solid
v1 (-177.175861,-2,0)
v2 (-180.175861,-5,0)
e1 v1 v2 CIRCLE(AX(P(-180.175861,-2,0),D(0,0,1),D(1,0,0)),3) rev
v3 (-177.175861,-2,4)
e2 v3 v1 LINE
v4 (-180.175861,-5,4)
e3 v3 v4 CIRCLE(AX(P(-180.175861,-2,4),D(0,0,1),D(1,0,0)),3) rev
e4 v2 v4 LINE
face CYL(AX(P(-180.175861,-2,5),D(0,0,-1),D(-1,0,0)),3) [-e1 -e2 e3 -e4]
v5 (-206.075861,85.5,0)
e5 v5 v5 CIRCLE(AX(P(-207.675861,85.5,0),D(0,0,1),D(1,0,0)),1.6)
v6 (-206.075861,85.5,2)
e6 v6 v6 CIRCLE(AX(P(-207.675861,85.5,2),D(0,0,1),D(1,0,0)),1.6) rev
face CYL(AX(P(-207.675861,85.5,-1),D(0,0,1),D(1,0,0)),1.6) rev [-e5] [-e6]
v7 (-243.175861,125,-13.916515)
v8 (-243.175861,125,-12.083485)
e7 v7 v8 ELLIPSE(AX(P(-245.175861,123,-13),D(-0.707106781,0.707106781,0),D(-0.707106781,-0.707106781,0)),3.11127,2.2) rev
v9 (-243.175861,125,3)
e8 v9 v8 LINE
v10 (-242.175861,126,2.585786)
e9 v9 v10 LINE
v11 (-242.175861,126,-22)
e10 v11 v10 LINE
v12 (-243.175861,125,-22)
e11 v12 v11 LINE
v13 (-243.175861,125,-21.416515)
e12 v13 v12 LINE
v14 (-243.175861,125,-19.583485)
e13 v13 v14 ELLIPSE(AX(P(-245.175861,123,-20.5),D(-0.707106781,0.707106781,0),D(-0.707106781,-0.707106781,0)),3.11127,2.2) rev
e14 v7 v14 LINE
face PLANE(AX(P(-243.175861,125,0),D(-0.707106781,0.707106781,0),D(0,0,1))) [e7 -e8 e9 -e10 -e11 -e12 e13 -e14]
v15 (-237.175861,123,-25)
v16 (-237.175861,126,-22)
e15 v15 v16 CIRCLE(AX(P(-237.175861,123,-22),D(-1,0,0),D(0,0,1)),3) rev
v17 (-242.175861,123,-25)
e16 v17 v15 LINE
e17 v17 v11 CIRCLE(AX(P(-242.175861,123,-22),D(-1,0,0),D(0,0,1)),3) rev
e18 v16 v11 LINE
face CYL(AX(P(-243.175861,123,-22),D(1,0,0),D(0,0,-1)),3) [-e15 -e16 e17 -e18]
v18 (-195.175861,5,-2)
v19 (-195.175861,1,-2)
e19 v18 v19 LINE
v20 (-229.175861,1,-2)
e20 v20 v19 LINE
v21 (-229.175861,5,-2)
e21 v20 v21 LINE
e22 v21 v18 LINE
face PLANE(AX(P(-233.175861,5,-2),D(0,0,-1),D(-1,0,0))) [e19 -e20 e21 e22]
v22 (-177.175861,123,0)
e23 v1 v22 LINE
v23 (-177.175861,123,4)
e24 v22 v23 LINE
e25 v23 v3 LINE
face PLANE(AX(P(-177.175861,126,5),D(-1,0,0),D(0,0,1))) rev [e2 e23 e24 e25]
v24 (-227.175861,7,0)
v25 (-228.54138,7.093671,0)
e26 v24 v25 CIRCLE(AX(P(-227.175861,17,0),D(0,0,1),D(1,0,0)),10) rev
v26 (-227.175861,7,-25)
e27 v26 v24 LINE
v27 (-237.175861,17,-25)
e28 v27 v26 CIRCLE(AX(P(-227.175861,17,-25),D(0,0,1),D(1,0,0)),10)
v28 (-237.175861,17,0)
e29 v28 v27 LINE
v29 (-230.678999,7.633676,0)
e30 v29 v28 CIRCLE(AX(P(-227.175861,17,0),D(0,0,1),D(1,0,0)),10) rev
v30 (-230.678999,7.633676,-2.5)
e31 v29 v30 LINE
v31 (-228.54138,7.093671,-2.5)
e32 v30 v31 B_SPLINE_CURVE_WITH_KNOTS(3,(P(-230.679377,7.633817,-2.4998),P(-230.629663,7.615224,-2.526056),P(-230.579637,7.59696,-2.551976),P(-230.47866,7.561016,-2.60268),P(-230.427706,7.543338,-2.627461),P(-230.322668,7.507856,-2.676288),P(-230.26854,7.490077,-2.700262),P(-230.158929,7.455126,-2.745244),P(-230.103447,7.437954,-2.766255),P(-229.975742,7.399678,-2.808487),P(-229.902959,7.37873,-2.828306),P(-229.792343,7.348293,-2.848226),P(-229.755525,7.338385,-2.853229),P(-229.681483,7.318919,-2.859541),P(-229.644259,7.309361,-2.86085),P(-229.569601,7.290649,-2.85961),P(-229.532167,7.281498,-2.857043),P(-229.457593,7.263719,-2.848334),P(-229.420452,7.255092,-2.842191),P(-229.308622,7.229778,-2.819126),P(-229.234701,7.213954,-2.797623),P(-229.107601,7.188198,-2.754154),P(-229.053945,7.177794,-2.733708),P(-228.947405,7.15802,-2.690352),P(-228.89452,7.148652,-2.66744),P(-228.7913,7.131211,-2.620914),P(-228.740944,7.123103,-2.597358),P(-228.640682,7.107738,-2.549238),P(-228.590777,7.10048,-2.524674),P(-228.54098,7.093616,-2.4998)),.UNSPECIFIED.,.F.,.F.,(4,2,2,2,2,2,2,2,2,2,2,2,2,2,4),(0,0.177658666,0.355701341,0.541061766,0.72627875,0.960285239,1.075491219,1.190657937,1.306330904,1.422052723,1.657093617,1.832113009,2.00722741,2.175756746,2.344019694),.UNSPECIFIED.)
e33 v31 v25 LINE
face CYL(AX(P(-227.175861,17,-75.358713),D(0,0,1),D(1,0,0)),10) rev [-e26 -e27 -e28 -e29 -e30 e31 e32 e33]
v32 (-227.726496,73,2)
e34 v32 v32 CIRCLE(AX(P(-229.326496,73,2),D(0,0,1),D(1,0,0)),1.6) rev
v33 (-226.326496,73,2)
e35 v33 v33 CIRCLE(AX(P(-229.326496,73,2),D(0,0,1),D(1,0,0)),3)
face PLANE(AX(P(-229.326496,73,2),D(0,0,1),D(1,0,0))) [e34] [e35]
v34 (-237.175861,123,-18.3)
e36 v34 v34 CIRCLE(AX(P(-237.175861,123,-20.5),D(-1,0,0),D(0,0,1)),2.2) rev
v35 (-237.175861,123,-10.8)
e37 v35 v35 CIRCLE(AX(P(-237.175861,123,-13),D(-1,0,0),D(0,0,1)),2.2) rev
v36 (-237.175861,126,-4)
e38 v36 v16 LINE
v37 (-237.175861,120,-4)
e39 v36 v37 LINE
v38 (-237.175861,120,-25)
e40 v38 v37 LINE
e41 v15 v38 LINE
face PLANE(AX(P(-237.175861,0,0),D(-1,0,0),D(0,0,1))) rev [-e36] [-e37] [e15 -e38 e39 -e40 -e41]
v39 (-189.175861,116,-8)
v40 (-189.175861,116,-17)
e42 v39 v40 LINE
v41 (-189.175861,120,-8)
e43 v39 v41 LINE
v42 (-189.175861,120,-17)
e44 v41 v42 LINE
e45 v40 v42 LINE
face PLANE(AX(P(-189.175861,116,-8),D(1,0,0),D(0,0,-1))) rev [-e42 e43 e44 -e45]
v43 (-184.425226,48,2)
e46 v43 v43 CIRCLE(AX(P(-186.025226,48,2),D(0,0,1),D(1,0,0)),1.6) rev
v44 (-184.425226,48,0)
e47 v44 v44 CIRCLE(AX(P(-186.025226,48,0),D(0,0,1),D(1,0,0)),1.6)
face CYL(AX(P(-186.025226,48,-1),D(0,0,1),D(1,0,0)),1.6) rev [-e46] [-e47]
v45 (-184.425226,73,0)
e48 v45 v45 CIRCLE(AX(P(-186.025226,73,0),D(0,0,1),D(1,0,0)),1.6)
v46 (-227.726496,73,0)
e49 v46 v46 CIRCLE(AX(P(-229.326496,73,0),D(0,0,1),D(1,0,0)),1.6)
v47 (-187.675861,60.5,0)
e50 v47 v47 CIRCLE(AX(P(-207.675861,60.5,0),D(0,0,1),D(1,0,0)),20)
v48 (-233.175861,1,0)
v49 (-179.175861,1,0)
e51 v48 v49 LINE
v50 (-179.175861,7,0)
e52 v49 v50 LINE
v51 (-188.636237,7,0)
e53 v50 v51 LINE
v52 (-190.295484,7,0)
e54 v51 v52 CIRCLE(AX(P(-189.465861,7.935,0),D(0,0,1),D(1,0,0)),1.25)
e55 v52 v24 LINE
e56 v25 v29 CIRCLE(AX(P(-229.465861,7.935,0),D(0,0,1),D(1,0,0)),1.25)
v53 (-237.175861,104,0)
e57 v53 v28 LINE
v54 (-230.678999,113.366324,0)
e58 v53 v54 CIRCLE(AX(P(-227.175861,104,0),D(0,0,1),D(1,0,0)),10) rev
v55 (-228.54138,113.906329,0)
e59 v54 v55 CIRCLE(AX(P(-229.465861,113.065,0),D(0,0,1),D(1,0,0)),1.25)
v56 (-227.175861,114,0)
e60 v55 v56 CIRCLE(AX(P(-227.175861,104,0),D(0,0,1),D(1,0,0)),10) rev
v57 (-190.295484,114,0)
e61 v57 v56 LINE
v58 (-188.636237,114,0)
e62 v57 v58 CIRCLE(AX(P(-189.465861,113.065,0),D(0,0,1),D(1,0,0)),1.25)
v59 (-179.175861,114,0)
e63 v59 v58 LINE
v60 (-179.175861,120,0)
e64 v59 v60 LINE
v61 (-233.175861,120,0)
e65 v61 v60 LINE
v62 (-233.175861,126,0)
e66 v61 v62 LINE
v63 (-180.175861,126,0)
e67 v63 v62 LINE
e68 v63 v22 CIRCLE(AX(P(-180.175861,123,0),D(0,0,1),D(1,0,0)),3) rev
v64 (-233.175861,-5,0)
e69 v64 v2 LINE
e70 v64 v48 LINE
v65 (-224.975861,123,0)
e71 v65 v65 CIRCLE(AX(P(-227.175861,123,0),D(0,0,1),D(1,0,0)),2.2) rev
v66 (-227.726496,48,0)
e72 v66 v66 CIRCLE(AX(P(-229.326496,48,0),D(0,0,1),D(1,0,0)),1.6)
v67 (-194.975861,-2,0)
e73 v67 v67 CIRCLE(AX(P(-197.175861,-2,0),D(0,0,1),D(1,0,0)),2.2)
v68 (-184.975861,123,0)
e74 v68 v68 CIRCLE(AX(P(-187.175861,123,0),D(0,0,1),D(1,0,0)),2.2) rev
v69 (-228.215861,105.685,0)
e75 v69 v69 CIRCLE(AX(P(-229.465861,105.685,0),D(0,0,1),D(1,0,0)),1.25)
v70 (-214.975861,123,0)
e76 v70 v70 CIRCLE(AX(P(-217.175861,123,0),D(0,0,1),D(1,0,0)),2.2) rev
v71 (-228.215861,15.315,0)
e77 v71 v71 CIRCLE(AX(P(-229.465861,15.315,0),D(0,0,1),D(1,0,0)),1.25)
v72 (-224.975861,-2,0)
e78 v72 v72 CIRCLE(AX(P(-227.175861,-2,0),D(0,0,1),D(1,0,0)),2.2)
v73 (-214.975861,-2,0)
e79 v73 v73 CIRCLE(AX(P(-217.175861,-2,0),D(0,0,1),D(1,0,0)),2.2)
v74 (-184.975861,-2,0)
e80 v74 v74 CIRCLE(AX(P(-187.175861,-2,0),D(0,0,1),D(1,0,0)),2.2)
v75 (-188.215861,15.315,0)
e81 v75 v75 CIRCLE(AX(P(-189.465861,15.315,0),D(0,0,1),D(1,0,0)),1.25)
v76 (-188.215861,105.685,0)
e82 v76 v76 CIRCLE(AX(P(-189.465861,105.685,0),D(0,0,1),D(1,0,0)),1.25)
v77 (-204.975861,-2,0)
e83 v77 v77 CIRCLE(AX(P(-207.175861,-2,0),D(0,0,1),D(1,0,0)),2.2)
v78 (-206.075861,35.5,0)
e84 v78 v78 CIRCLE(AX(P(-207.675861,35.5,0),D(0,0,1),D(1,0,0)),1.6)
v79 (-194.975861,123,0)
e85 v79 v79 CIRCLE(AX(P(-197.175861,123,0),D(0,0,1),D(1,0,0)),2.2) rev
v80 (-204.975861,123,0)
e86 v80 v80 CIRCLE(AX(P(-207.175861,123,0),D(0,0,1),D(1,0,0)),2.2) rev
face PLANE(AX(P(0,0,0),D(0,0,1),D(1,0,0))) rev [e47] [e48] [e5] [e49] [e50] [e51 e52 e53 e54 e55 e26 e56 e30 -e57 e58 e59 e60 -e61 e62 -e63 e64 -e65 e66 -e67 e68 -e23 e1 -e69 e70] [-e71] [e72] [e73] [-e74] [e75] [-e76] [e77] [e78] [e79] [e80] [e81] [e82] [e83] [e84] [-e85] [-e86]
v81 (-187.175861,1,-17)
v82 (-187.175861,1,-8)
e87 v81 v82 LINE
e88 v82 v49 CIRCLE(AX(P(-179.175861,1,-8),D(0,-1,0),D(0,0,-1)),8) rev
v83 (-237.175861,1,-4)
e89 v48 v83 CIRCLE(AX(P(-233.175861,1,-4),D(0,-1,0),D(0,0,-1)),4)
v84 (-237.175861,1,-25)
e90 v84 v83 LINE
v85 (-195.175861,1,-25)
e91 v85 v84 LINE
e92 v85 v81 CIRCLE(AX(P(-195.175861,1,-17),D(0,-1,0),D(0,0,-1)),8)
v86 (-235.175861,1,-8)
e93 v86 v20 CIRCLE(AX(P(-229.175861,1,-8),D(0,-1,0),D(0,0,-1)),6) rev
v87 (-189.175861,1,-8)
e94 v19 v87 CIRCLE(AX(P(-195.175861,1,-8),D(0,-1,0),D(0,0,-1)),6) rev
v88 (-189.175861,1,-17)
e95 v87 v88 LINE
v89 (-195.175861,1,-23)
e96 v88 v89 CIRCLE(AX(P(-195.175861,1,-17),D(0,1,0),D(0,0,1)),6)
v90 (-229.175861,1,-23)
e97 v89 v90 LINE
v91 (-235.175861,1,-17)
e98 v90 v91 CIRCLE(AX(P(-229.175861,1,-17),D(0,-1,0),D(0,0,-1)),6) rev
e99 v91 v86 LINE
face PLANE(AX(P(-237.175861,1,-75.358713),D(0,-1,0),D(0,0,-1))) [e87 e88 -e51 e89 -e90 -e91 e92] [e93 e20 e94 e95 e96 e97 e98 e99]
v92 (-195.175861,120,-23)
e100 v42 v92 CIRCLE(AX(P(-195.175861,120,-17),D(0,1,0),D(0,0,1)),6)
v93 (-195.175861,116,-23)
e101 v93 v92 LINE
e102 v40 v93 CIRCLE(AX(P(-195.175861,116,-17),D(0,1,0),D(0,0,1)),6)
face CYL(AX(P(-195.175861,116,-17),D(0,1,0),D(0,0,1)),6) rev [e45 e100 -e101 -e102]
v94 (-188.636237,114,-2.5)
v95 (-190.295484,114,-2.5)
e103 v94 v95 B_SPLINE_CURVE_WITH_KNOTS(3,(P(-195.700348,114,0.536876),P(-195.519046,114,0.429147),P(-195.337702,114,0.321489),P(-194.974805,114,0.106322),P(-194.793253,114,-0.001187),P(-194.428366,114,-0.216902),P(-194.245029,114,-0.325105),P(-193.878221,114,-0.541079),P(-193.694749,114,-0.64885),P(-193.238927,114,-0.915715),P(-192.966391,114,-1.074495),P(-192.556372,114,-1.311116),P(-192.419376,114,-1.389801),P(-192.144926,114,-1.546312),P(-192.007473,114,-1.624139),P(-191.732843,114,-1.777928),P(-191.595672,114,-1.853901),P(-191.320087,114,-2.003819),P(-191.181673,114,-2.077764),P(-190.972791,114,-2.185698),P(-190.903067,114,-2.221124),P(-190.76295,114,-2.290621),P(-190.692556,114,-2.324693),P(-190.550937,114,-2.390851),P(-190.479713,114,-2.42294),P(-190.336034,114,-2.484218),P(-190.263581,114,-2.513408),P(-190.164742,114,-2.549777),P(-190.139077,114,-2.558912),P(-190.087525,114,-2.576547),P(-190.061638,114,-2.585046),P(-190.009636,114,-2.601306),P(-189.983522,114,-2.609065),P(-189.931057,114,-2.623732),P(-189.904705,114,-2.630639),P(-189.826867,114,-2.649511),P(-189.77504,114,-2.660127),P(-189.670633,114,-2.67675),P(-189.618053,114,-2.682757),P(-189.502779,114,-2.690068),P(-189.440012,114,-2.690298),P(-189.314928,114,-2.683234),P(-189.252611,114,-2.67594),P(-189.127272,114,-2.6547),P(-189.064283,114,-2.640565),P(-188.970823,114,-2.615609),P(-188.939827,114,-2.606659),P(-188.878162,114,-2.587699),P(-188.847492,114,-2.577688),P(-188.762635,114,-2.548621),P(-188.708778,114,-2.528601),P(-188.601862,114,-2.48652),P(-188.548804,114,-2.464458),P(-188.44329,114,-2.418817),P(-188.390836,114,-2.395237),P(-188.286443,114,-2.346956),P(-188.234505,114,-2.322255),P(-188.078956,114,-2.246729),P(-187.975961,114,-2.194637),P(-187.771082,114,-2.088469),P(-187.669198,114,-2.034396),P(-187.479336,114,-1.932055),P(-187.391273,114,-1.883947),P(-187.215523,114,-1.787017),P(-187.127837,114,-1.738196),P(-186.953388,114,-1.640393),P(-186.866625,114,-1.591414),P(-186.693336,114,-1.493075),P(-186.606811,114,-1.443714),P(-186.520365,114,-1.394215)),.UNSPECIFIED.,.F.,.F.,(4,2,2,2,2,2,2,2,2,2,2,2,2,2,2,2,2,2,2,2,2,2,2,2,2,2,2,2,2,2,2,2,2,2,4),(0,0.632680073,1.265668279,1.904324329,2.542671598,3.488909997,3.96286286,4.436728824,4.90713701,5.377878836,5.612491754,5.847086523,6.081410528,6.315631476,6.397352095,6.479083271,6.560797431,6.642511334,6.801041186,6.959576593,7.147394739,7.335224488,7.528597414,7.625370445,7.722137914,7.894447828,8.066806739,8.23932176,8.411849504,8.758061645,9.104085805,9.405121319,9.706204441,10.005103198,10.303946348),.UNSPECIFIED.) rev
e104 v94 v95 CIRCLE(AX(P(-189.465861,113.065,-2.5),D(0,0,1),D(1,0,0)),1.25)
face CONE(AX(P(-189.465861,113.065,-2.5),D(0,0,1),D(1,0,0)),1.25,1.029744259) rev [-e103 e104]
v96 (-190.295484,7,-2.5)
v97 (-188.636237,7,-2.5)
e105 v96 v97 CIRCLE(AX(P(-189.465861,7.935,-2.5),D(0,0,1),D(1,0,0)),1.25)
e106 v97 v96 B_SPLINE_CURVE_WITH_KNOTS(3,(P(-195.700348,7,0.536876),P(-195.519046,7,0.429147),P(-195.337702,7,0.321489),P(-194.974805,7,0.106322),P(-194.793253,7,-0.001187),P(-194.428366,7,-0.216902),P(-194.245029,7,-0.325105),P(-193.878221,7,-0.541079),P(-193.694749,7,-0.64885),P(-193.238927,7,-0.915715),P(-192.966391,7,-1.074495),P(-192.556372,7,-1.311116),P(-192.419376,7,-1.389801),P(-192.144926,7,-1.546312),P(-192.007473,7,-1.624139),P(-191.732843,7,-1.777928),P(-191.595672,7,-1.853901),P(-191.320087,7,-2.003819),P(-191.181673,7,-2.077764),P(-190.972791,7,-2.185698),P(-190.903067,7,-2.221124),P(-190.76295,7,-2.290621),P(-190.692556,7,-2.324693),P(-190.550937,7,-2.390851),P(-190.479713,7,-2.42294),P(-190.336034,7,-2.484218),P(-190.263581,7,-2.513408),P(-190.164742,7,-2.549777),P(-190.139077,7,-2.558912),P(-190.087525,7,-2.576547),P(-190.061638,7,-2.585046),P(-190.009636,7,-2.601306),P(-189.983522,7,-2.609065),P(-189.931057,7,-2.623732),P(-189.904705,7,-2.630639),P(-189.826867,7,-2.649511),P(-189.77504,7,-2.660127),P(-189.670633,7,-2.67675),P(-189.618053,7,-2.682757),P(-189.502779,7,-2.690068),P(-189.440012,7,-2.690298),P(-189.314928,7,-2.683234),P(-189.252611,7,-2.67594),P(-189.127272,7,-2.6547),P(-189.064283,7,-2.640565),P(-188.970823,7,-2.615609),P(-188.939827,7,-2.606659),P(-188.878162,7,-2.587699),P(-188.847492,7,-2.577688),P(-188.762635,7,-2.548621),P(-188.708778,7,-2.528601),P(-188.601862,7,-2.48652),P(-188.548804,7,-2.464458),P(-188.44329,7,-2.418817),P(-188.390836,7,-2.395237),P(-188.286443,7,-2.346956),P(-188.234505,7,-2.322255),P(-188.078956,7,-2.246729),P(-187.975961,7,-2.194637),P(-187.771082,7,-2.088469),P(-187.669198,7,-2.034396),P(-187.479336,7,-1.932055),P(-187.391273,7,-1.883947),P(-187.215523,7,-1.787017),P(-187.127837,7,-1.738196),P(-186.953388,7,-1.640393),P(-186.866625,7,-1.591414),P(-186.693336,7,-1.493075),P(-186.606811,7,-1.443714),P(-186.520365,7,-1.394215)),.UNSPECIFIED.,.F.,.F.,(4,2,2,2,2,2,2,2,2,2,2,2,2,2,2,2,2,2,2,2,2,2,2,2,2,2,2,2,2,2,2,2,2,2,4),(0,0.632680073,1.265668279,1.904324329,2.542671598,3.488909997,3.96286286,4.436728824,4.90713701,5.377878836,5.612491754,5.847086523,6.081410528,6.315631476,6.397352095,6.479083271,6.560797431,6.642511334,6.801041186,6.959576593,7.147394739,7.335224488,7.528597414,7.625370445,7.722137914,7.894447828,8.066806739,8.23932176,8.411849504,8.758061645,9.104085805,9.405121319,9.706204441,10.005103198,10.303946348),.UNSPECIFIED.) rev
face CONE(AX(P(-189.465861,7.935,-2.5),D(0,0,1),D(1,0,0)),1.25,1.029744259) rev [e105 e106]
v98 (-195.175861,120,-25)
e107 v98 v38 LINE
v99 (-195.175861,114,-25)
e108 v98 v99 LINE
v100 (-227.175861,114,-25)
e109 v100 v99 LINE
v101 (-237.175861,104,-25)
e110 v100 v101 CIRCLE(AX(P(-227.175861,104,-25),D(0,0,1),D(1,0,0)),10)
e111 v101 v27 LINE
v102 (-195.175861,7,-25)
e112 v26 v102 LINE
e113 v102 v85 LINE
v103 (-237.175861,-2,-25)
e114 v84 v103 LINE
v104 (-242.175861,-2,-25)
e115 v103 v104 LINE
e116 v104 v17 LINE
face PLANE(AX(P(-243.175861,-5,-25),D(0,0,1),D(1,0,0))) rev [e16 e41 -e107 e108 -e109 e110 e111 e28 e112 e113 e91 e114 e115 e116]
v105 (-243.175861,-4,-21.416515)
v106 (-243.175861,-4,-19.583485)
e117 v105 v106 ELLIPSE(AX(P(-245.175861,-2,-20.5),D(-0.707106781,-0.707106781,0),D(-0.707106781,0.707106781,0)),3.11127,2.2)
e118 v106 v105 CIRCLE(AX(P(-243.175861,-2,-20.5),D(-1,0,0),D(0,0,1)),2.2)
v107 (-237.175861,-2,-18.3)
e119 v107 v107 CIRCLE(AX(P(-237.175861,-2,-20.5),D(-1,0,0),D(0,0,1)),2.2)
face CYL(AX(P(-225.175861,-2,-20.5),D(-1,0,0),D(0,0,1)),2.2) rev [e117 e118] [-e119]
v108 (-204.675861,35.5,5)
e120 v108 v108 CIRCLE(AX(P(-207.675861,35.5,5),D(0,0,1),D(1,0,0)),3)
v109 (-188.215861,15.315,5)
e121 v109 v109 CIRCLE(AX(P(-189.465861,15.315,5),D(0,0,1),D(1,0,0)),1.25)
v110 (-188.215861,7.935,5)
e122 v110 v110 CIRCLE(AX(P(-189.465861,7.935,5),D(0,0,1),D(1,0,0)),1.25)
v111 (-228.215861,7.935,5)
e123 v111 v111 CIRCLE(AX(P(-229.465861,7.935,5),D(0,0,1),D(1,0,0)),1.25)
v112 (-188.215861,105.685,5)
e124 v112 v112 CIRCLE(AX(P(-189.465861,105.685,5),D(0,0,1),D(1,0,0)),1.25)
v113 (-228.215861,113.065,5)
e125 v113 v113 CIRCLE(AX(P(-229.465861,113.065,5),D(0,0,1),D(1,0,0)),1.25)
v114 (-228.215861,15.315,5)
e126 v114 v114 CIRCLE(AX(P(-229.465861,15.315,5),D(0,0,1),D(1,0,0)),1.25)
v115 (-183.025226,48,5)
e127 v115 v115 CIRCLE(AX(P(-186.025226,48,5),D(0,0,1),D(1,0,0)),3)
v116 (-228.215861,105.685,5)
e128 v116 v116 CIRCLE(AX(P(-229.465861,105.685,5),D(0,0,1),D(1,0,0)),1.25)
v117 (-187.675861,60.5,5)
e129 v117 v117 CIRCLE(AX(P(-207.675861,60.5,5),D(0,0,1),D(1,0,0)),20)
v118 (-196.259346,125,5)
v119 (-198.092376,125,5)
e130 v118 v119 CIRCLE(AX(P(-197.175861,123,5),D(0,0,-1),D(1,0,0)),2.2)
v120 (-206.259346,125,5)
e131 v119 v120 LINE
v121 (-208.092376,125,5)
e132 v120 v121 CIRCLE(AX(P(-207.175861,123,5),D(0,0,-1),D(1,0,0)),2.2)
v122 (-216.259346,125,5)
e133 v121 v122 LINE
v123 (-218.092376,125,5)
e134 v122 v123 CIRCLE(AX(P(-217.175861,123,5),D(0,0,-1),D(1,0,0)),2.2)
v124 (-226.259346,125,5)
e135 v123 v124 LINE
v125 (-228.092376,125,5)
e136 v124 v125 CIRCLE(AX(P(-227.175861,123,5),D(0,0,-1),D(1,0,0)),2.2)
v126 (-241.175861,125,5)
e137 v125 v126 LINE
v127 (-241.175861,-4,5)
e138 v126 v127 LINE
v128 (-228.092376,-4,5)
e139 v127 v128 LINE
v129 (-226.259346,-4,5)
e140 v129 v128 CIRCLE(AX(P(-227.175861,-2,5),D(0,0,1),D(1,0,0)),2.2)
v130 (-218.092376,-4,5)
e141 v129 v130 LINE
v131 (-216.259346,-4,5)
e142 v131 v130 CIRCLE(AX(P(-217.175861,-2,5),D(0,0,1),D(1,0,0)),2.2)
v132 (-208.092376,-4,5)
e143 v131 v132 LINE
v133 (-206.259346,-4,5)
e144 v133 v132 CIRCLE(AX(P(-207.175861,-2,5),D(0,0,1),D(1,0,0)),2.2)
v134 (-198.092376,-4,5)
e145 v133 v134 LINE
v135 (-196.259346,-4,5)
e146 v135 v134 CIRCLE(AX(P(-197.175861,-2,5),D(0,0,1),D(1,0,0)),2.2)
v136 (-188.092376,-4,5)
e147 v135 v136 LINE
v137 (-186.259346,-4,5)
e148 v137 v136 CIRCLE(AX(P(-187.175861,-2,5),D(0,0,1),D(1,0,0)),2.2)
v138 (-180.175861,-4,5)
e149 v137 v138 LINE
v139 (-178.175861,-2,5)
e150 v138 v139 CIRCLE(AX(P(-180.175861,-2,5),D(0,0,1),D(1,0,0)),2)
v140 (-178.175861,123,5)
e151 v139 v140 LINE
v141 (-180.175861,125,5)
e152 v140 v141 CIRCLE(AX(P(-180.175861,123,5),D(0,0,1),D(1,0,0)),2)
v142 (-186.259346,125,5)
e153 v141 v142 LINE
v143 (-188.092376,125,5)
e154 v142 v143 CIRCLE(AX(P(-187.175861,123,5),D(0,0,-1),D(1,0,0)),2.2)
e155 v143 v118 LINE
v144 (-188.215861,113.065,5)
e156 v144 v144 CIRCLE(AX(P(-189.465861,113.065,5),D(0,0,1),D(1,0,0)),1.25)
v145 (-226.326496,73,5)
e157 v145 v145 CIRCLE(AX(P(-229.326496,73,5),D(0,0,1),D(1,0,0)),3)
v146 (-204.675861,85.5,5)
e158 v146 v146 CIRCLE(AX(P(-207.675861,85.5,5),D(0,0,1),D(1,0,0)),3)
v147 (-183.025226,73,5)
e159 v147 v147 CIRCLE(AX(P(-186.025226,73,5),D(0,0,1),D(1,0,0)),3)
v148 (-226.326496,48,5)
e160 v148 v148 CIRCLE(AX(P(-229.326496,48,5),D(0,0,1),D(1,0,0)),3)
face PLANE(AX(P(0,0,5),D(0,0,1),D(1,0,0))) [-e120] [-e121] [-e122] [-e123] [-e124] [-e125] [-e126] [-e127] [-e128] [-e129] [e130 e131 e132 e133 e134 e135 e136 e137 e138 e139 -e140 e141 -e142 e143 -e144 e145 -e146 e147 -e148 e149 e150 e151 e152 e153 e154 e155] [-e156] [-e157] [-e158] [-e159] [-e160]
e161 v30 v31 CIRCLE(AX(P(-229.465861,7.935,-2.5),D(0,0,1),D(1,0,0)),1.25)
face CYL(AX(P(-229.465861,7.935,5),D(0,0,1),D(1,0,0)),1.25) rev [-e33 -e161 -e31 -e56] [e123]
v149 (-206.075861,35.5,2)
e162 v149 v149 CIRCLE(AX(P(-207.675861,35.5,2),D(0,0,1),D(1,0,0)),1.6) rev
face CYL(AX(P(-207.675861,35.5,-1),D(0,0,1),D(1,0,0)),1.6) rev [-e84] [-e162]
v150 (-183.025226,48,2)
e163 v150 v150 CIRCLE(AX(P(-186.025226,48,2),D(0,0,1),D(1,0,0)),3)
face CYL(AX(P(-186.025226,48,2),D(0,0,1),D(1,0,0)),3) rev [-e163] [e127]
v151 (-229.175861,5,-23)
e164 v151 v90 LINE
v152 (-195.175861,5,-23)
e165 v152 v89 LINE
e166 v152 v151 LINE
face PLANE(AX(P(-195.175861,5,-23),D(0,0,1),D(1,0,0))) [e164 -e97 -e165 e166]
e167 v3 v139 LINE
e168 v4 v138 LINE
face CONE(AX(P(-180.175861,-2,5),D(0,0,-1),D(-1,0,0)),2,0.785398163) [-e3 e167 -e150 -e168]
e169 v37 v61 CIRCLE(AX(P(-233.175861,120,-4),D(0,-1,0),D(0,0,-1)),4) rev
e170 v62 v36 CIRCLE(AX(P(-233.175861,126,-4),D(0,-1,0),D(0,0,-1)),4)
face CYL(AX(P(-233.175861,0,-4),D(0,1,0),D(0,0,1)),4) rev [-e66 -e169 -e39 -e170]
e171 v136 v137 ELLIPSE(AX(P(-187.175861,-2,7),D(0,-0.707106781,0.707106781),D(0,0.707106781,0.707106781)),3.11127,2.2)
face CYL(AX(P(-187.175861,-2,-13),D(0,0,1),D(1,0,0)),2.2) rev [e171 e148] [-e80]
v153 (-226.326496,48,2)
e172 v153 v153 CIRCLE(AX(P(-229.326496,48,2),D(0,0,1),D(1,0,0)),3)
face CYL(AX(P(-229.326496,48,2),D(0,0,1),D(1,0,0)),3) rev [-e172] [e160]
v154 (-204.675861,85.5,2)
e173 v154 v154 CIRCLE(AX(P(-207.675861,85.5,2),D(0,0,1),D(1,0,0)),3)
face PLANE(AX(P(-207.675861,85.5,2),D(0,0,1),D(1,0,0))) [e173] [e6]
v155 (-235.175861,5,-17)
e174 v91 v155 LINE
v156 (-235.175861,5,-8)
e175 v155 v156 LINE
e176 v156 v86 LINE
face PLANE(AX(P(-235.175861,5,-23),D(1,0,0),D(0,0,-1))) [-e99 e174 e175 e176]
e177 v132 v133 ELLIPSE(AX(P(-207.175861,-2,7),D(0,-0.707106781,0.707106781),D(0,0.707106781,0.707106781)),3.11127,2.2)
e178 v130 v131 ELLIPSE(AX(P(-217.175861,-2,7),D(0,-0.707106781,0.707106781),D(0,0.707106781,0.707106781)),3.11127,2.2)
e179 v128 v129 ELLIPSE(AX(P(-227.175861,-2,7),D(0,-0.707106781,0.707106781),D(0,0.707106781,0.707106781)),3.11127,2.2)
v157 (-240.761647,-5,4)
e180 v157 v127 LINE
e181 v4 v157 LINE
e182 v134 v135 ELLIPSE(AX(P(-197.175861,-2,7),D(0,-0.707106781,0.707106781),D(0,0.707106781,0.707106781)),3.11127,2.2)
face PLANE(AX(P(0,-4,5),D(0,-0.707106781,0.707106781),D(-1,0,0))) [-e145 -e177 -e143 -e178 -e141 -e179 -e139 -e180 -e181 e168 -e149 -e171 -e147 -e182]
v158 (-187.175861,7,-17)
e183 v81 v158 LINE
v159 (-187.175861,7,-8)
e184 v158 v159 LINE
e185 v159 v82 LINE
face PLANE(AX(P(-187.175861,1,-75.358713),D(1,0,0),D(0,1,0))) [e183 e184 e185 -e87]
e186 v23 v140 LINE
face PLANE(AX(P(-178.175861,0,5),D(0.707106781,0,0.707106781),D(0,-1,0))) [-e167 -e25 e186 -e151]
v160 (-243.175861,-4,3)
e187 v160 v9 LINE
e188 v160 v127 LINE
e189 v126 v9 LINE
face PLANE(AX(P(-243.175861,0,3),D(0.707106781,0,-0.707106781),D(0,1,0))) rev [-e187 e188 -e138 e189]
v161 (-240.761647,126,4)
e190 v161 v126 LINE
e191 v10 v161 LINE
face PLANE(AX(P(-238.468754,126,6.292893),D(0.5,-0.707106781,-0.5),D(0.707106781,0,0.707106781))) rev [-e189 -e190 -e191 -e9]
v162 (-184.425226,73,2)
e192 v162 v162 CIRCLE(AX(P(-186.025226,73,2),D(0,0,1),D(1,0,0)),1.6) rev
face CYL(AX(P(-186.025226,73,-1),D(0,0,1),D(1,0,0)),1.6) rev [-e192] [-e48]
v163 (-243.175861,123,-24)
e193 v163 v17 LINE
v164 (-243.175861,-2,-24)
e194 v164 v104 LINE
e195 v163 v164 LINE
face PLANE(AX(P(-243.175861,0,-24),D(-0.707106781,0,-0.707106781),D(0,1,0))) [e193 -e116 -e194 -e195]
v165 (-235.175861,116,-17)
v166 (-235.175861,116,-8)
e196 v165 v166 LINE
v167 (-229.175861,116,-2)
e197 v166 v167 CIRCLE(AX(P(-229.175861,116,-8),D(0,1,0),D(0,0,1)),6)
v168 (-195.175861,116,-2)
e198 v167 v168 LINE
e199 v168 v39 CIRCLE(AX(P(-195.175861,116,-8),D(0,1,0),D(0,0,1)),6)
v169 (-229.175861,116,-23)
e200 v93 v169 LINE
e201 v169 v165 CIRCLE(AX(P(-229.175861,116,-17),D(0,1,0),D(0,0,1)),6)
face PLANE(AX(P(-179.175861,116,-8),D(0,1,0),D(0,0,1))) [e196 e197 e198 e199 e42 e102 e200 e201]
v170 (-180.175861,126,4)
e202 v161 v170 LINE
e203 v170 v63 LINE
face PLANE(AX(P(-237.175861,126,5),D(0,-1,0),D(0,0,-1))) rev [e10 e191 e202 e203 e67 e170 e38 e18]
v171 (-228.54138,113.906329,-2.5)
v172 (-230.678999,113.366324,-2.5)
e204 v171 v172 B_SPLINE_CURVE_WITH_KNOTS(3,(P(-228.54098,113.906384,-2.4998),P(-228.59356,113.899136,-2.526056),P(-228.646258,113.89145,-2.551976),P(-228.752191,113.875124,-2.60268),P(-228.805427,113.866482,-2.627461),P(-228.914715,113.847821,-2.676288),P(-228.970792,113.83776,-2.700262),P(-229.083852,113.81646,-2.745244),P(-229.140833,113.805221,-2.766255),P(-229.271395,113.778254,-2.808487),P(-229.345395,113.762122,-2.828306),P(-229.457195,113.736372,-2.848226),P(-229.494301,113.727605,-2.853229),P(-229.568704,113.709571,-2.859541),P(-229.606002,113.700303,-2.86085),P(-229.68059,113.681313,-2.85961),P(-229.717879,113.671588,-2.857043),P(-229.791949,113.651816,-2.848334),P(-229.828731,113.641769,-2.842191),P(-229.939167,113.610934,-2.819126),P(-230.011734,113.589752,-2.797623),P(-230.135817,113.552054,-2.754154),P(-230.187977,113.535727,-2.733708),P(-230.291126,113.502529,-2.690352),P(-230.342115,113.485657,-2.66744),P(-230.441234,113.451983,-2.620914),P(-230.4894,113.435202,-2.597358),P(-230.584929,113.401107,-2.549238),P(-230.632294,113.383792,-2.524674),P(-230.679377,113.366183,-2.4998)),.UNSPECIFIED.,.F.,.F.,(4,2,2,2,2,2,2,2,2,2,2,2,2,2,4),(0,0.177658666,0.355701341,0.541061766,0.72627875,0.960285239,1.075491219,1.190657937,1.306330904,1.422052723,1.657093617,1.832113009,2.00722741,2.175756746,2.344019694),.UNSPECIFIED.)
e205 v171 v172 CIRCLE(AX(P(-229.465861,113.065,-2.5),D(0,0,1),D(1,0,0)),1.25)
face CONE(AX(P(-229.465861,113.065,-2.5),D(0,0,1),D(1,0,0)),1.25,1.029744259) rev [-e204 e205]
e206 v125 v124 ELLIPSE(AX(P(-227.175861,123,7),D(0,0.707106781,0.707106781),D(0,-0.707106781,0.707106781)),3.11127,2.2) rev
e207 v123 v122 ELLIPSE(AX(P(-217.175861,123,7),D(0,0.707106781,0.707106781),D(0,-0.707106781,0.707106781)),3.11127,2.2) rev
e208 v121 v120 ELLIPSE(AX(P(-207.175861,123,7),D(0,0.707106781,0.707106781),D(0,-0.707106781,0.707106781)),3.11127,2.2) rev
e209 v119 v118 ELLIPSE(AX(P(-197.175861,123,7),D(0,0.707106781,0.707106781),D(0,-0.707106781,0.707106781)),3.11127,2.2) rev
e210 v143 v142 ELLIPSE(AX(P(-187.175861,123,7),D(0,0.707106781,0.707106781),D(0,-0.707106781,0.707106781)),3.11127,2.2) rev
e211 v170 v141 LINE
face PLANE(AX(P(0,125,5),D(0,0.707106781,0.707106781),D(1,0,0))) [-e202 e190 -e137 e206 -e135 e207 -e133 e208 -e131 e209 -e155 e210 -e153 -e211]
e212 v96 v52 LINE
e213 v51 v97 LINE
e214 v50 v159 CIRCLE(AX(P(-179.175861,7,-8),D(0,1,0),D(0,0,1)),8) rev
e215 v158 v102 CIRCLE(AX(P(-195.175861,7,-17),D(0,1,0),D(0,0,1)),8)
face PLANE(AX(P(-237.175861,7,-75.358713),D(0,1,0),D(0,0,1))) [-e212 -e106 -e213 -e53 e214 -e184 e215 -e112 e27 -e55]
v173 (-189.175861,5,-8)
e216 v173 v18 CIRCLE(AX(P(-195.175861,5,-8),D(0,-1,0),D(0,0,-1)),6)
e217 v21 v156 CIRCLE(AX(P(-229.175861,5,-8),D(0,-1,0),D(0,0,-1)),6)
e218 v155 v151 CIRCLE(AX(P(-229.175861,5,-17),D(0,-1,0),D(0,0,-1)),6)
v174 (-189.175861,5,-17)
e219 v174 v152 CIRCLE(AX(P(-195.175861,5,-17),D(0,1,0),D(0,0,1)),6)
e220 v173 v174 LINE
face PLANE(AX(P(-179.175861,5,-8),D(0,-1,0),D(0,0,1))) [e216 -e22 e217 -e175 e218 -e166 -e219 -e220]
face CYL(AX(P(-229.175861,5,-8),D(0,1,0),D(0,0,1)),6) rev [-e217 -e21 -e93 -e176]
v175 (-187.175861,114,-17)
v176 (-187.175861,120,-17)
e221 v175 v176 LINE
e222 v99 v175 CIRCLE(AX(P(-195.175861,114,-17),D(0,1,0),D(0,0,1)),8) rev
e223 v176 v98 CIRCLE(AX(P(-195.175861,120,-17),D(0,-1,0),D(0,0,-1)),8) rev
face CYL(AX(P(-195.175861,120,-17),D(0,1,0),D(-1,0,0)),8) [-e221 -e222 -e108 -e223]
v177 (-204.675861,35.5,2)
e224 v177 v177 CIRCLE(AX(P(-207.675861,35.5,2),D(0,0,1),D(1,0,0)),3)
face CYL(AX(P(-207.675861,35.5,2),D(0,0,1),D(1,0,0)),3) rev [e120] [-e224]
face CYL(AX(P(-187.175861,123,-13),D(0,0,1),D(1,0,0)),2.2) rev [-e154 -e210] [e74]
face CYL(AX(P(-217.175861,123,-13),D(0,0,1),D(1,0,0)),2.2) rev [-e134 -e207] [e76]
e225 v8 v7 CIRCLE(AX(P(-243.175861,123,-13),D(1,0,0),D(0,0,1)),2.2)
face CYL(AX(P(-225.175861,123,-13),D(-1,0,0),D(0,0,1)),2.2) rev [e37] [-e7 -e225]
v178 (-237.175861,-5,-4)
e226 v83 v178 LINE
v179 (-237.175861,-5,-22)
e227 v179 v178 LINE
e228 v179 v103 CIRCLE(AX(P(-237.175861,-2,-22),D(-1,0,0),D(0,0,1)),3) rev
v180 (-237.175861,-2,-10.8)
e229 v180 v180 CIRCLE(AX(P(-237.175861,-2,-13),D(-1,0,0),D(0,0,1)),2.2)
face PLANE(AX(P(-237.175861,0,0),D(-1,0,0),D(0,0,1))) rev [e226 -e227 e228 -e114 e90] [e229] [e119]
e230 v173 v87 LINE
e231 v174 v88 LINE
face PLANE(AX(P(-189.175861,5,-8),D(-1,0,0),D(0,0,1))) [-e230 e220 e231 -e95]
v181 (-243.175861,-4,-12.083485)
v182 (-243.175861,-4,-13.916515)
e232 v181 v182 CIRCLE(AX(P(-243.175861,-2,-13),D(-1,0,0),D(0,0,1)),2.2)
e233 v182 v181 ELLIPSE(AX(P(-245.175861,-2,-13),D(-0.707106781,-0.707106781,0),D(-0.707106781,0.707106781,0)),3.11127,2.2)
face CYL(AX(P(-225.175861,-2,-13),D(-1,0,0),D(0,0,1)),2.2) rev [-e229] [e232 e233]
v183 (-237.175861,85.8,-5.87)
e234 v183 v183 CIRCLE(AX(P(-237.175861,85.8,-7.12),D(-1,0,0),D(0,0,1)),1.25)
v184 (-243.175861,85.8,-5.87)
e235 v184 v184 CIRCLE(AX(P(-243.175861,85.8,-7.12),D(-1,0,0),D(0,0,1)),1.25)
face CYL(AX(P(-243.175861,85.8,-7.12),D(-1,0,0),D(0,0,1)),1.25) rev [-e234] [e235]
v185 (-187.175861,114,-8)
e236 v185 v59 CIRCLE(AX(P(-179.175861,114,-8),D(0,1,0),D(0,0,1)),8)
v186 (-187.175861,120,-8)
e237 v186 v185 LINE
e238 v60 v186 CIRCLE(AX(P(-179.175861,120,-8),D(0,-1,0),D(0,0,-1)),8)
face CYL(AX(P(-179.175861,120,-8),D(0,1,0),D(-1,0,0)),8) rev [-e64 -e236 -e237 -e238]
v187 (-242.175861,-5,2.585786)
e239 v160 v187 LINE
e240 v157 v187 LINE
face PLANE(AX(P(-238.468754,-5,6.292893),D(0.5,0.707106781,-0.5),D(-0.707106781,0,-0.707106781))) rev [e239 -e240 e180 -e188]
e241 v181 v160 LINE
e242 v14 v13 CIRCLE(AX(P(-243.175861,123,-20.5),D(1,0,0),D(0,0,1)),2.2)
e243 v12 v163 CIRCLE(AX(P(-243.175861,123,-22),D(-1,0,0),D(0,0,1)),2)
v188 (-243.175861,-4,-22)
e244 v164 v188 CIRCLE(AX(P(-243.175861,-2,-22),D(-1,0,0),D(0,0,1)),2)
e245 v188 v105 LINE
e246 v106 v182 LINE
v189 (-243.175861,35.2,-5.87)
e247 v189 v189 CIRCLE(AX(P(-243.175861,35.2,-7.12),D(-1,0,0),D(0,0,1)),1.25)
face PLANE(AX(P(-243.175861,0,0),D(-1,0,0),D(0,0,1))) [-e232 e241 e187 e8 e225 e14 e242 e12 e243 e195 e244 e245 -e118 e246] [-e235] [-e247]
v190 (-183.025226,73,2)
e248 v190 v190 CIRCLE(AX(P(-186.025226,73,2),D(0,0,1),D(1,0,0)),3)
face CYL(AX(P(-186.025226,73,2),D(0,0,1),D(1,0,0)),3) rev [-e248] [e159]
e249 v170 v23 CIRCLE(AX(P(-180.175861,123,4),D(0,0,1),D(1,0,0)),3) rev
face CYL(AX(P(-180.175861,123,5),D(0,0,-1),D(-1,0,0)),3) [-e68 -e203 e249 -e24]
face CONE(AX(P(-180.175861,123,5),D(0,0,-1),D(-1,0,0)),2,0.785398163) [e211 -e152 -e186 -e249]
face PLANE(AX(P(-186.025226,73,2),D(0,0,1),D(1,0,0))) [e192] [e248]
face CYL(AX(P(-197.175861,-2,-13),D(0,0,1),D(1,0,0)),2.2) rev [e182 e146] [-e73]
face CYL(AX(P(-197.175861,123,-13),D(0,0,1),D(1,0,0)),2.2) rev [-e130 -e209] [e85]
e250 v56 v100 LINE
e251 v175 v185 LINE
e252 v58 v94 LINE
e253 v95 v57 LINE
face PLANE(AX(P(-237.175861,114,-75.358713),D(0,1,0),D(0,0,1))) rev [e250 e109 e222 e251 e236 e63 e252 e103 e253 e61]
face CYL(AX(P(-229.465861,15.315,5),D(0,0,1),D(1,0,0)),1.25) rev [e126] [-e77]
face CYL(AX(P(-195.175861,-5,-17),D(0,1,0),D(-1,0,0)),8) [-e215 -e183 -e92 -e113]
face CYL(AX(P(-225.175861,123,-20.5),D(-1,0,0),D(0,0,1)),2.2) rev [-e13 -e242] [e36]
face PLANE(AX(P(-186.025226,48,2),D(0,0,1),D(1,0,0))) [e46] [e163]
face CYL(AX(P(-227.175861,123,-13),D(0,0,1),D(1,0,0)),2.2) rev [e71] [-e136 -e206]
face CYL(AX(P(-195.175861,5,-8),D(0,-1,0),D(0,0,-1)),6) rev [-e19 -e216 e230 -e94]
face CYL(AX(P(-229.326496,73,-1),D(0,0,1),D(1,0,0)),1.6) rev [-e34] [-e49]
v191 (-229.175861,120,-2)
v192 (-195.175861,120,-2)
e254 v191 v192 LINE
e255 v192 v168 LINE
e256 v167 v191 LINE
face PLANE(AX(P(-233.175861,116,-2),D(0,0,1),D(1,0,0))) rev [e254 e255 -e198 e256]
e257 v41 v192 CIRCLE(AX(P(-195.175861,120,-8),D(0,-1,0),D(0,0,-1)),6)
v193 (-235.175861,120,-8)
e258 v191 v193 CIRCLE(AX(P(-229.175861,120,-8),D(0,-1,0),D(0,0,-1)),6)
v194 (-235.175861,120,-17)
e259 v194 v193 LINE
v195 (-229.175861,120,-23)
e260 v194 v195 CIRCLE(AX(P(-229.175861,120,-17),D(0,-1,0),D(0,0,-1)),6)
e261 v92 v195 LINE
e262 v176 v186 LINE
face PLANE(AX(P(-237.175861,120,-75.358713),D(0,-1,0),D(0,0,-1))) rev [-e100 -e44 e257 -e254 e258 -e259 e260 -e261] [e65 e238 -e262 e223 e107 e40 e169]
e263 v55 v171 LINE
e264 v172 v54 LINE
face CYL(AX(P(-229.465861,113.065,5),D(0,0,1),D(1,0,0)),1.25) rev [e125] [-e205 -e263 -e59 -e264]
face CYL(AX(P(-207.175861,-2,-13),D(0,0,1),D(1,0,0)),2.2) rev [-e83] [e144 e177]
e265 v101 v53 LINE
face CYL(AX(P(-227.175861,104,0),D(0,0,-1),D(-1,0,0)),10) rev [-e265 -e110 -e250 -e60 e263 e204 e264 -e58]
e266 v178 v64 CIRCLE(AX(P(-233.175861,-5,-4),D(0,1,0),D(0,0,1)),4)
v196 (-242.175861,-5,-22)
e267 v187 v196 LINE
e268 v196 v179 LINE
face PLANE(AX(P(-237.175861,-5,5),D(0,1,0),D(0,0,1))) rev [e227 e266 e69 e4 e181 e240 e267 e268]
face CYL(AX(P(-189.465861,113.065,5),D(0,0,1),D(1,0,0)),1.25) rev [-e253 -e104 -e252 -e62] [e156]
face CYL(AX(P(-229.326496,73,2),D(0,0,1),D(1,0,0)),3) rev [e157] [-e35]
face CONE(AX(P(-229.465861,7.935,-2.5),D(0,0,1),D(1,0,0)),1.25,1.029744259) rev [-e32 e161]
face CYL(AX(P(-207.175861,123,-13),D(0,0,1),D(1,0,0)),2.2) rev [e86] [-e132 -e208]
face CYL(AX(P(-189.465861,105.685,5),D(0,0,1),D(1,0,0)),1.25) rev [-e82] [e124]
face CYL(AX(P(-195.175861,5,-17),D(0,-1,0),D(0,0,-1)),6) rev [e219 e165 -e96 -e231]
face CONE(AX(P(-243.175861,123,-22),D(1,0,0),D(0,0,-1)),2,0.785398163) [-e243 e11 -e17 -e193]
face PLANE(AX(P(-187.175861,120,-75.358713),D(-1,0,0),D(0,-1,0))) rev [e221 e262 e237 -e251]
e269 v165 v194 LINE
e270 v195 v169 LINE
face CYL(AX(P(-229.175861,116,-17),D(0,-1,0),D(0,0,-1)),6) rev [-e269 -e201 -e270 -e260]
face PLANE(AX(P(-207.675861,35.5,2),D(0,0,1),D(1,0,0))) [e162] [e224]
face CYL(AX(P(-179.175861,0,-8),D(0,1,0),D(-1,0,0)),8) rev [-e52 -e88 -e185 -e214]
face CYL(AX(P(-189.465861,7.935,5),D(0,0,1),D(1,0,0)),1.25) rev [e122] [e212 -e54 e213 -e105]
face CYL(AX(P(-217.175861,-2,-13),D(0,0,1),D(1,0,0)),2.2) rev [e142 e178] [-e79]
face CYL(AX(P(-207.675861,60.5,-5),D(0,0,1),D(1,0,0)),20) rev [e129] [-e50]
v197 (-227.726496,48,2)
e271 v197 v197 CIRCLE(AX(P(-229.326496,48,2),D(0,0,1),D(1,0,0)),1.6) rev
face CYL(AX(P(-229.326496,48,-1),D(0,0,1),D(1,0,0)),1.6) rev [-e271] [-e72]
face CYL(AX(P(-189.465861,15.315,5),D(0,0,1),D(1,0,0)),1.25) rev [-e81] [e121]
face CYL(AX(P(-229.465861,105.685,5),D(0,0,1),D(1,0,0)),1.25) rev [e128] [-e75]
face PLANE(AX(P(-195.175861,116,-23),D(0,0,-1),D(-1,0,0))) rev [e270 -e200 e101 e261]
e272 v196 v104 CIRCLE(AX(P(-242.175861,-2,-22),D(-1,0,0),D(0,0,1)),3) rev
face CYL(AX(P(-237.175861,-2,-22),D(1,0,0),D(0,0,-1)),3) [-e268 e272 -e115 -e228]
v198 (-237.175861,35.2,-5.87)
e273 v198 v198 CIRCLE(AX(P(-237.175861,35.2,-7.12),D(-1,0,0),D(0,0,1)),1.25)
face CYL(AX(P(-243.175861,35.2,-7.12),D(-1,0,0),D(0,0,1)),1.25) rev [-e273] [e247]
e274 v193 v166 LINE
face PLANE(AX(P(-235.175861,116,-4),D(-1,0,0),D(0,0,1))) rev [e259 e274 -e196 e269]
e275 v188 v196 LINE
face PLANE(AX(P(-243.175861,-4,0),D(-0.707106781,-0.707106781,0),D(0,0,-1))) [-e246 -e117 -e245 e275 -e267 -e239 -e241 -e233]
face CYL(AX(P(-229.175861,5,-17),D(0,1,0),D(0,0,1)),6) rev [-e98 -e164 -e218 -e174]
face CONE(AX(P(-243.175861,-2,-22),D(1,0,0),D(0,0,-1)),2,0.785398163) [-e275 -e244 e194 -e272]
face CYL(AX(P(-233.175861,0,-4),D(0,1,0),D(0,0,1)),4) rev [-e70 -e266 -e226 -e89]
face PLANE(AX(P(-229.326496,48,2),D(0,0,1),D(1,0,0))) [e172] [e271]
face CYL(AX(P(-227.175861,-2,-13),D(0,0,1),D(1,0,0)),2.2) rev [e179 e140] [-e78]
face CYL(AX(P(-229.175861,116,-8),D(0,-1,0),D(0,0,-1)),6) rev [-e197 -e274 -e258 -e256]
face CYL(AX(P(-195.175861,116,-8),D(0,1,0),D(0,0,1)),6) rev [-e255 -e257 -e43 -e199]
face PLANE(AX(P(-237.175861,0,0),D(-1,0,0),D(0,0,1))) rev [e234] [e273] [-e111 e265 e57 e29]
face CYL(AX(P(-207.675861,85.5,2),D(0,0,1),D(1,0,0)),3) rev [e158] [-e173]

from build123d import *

# Parameters (mm, degrees)
SKETCH_1_W                  = 60
SKETCH_1_H                  = 131
EXTRUDE_1_DEPTH             = 5
SKETCH_2_W                  = 30
SKETCH_2_H                  = 131
EXTRUDE_2_DEPTH             = 6
SKETCH_3_R                  = 20
CUT_EXTRUDE_1_DEPTH         = 10
CHAMFER_1_SIZE              = 2
FILLET_1_R                  = 3
SKETCH_13_R                 = 1.6
CUT_EXTRUDE_2_DEPTH         = 6
SKETCH_14_R                 = 3
CUT_EXTRUDE_3_DEPTH         = 3
CHAMFER_4_SIZE              = 1
SKETCH_16_W                 = 50
SKETCH_16_H                 = 6
EXTRUDE_4_DEPTH             = 25
FILLET_3_R                  = 4
FILLET_4_R                  = 10
FILLET_5_R                  = 8
CUT_EXTRUDE_4_DEPTH         = 4
FILLET_6_R                  = 6
SKETCH_19_R                 = 2.2
CUT_EXTRUDE_5_DEPTH         = 18
SKETCH_20_R                 = 2.2
CUT_EXTRUDE_6_DEPTH         = 18
HOLE_WIZARD_M3_1_AT_2_COUNT = 2
HOLE_WIZARD_M3_1_AT_2_PITCH = 40
HOLE_WIZARD_M3_1_AT_3_COUNT = 2
HOLE_WIZARD_M3_1_AT_3_PITCH = 105.617529322
HOLE_WIZARD_M3_1_AT_4_COUNT = 2
HOLE_WIZARD_M3_1_AT_4_PITCH = 97.75
HOLE_WIZARD_M3_2_D          = 2.5
HOLE_WIZARD_M3_2_DEPTH      = 7.5
HOLE_WIZARD_M3_2_TIP        = 0.751075774


with BuildPart() as part:
    # 草图1 → 凸台-拉伸1 (new body)
    with BuildSketch(Plane.XY):
        with Locations((-207.175860782, 60.5)):
            Rectangle(SKETCH_1_W, SKETCH_1_H)
    extrude(amount=EXTRUDE_1_DEPTH)

    # 草图2 → 凸台-拉伸2 (add)
    with BuildSketch(Plane.ZY.offset(237.175860782)):
        with Locations((-10, 60.5)):
            Rectangle(SKETCH_2_W, SKETCH_2_H)
    extrude(amount=EXTRUDE_2_DEPTH)

    # 草图3 → 切除-拉伸1 (cut)
    with BuildSketch(Plane.XY.offset(5)):
        with Locations((-207.675860782, 60.5)):
            Circle(SKETCH_3_R)
    extrude(amount=-CUT_EXTRUDE_1_DEPTH, mode=Mode.SUBTRACT)

    # 倒角1
    chamfer_1_edges = [part.edges().sort_by_distance(p)[0] for p in [
        (-243.175860782, 60.5, 5),
    ]]
    chamfer(chamfer_1_edges, length=CHAMFER_1_SIZE)

    # 圆角1
    fillet_1_edges = [part.edges().sort_by_distance(p)[0] for p in [
        (-240.175860782, 126, -25),
        (-240.175860782, -5, -25),
        (-177.175860782, 126, 2.5),
        (-177.175860782, -5, 2.5),
    ]]
    fillet(fillet_1_edges, radius=FILLET_1_R)

    # 草图13 → 切除-拉伸2 (cut)
    with BuildSketch(Plane.XY.offset(5)):
        with Locations((-207.675860782, 85.5)):
            Circle(SKETCH_13_R)
        with Locations((-229.326495877, 73)):
            Circle(SKETCH_13_R)
        with Locations((-186.025225688, 73)):
            Circle(SKETCH_13_R)
        with Locations((-186.025225688, 48)):
            Circle(SKETCH_13_R)
        with Locations((-207.675860782, 35.5)):
            Circle(SKETCH_13_R)
        with Locations((-229.326495877, 48)):
            Circle(SKETCH_13_R)
    extrude(amount=-CUT_EXTRUDE_2_DEPTH, mode=Mode.SUBTRACT)

    # 草图14 → 切除-拉伸3 (cut)
    with BuildSketch(Plane.XY.offset(5)):
        with Locations((-207.675860782, 85.5)):
            Circle(SKETCH_14_R)
        with Locations((-186.025225688, 73)):
            Circle(SKETCH_14_R)
        with Locations((-186.025225688, 48)):
            Circle(SKETCH_14_R)
        with Locations((-207.675860782, 35.5)):
            Circle(SKETCH_14_R)
        with Locations((-229.326495877, 48)):
            Circle(SKETCH_14_R)
        with Locations((-229.326495877, 73)):
            Circle(SKETCH_14_R)
    extrude(amount=-CUT_EXTRUDE_3_DEPTH, mode=Mode.SUBTRACT)

    # 倒角4
    chamfer_4_edges = [part.edges().sort_by_distance(p)[0] for p in [
        (-243.175860782, 126, -9.5),
        (-242.175860782, 126, 4),
        (-210.675860782, -5, 5),
        (-242.175860782, -5, 4),
        (-243.175860782, 60.5, -25),
        (-210.675860782, 126, 5),
        (-243.175860782, -5, -9.5),
        (-243.175860782, -4.121320344, -24.121320344),
        (-243.175860782, 125.121320344, -24.121320344),
        (-177.175860782, 60.5, 5),
        (-178.054540439, -4.121320344, 5),
        (-178.054540439, 125.121320344, 5),
    ]]
    chamfer(chamfer_4_edges, length=CHAMFER_4_SIZE)

    # 草图16 → 凸台-拉伸4 (add)
    with BuildSketch(Plane(origin=(0, 0, 0), x_dir=(-1, 0, 0), z_dir=(0, 0, -1))):
        with Locations((212.175860782, 117)):
            Rectangle(SKETCH_16_W, SKETCH_16_H)
    extrude_4 = extrude(amount=EXTRUDE_4_DEPTH)

    # 镜向1: 凸台-拉伸4 across plane
    add(extrude_4.mirror(Plane(origin=(0, 60.5, 0), x_dir=(0, 0, 1), z_dir=(0, -1, 0))))

    # 圆角3
    fillet_3_edges = [part.edges().sort_by_distance(p)[0] for p in [
        (-237.175860782, -2, 0),
        (-237.175860782, 123, 0),
    ]]
    fillet(fillet_3_edges, radius=FILLET_3_R)

    # 圆角4
    fillet_4_edges = [part.edges().sort_by_distance(p)[0] for p in [
        (-237.175860782, 114, -12.5),
        (-237.175860782, 7, -12.5),
    ]]
    fillet(fillet_4_edges, radius=FILLET_4_R)

    # 圆角5
    fillet_5_edges = [part.edges().sort_by_distance(p)[0] for p in [
        (-187.175860782, 117, -25),
        (-187.175860782, 117, 0),
        (-187.175860782, 4, 0),
        (-187.175860782, 4, -25),
    ]]
    fillet(fillet_5_edges, radius=FILLET_5_R)

    # 草图17 → 切除-拉伸4 (cut)
    with BuildSketch(Plane(origin=(0, 120, 0), x_dir=(1, 0, 0), z_dir=(0, 1, 0))):
        with BuildLine():
            Line((-235.175860782, 4), (-235.175860782, 2))
            Line((-235.175860782, 2), (-233.175860782, 2))
            Line((-233.175860782, 2), (-187.175860782, 2))
            ThreePointArc((-187.175860782, 2), (-188.662693763, 4.83772234), (-189.175860782, 8))
            Line((-189.175860782, 8), (-189.175860782, 17))
            ThreePointArc((-189.175860782, 17), (-190.933220095, 21.242640687), (-195.175860782, 23))
            Line((-195.175860782, 23), (-235.175860782, 23))
            Line((-235.175860782, 23), (-235.175860782, 4))
        make_face()
    cut_extrude_4 = extrude(amount=-CUT_EXTRUDE_4_DEPTH, mode=Mode.SUBTRACT)

    # 镜向2: 切除-拉伸4 across plane
    add(cut_extrude_4.mirror(Plane(origin=(0, 60.5, 0), x_dir=(0, 0, 1), z_dir=(0, -1, 0))), mode=Mode.SUBTRACT)

    # 圆角6
    fillet_6_edges = [part.edges().sort_by_distance(p)[0] for p in [
        (-235.175860782, 118, -2),
        (-235.175860782, 118, -23),
        (-235.175860782, 3, -2),
        (-235.175860782, 3, -23),
        (-187.175860782, 118, -2),
        (-187.175860782, 3, -2),
    ]]
    fillet(fillet_6_edges, radius=FILLET_6_R - 0.0001)  # a hair under: the kernel refuses the full size

    # 草图19 → 切除-拉伸5 (cut)
    with BuildSketch(Plane.XY.offset(5)):
        with Locations((-217.175860782, -2)):
            Circle(SKETCH_19_R)
        with Locations((-187.175860782, -2)):
            Circle(SKETCH_19_R)
        with Locations((-197.175860782, -2)):
            Circle(SKETCH_19_R)
        with Locations((-207.175860782, -2)):
            Circle(SKETCH_19_R)
        with Locations((-227.175860782, -2)):
            Circle(SKETCH_19_R)
    cut_extrude_5 = extrude(amount=-CUT_EXTRUDE_5_DEPTH, mode=Mode.SUBTRACT)

    # 镜向3: 切除-拉伸5 across plane
    add(cut_extrude_5.mirror(Plane(origin=(0, 60.5, 0), x_dir=(0, 0, 1), z_dir=(0, -1, 0))), mode=Mode.SUBTRACT)

    # 草图20 → 切除-拉伸6 (cut)
    with BuildSketch(Plane.ZY.offset(243.175860782)):
        with Locations((-20.5, -2)):
            Circle(SKETCH_20_R)
        with Locations((-13, -2)):
            Circle(SKETCH_20_R)
    cut_extrude_6 = extrude(amount=-CUT_EXTRUDE_6_DEPTH, mode=Mode.SUBTRACT)

    # 镜向4: 切除-拉伸6 across plane
    add(cut_extrude_6.mirror(Plane(origin=(0, 60.5, 0), x_dir=(0, 0, 1), z_dir=(0, -1, 0))), mode=Mode.SUBTRACT)

    # 草图23 → M3 螺纹孔1 (revolve, cut)
    with BuildSketch(Plane(origin=(-229.465860782, 113.065, 5), x_dir=(0, -1, 0), z_dir=(1, 0, 0))):
        Polygon((0, 0), (0, 8.251075774), (1.25, 7.5), (1.25, 0), align=None)
    hole_wizard_m3_1 = revolve(axis=Axis((-229.465860782, 113.065, 11.35), (0, 0, -1)), mode=Mode.SUBTRACT)

    # M3 螺纹孔1 at 2: M3 螺纹孔1 ×2
    with Locations(*[(i * HOLE_WIZARD_M3_1_AT_2_PITCH, 0, 0) for i in range(1, HOLE_WIZARD_M3_1_AT_2_COUNT)]):
        add(hole_wizard_m3_1, mode=Mode.SUBTRACT)

    # M3 螺纹孔1 at 3: M3 螺纹孔1 ×2
    with Locations(*[Vector(0.3787250114344214, -0.9255092466928666, 0) * (i * HOLE_WIZARD_M3_1_AT_3_PITCH) for i in range(1, HOLE_WIZARD_M3_1_AT_3_COUNT)]):
        add(hole_wizard_m3_1, mode=Mode.SUBTRACT)

    # M3 螺纹孔1 at 4: M3 螺纹孔1 ×2
    with Locations(*[(0, -i * HOLE_WIZARD_M3_1_AT_4_PITCH, 0) for i in range(1, HOLE_WIZARD_M3_1_AT_4_COUNT)]):
        add(hole_wizard_m3_1, mode=Mode.SUBTRACT)

    # 镜向5: M3 螺纹孔1 across plane
    add(hole_wizard_m3_1.mirror(Plane(origin=(0, 60.5, 0), x_dir=(0, 0, 1), z_dir=(0, -1, 0))), mode=Mode.SUBTRACT)

    # 镜向5 copy 1 sketch → 镜向5 copy 1 (revolve, cut)
    with BuildSketch(Plane(origin=(-189.465860782, 7.935, 5), x_dir=(0, 1, 0), z_dir=(1, 0, 0))):
        Polygon((0, 0), (0, -8.251075774), (1.25, -7.5), (1.25, 0), align=None)
    revolve(axis=Axis((-189.465860782, 7.935, 11.35), (0, 0, 1)), mode=Mode.SUBTRACT)

    # 镜向5 copy 2 sketch → 镜向5 copy 2 (revolve, cut)
    with BuildSketch(Plane(origin=(-189.465860782, 105.685, 5), x_dir=(0, 1, 0), z_dir=(1, 0, 0))):
        Polygon((0, 0), (0, -8.251075774), (1.25, -7.5), (1.25, 0), align=None)
    revolve(axis=Axis((-189.465860782, 105.685, 11.35), (0, 0, 1)), mode=Mode.SUBTRACT)

    # 镜向5 copy 3 sketch → 镜向5 copy 3 (revolve, cut)
    with BuildSketch(Plane(origin=(-229.465860782, 105.685, 5), x_dir=(0, 1, 0), z_dir=(1, 0, 0))):
        Polygon((0, 0), (0, -8.251075774), (1.25, -7.5), (1.25, 0), align=None)
    revolve(axis=Axis((-229.465860782, 105.685, 11.35), (0, 0, 1)), mode=Mode.SUBTRACT)

    # M3 螺纹孔2
    with Locations(Plane.ZY.offset(243.175860782)):
        with Locations((-7.12, 85.8), (-7.12, 35.2)):
            Hole(HOLE_WIZARD_M3_2_D / 2, depth=HOLE_WIZARD_M3_2_DEPTH)
            with Locations((0, 0, -(HOLE_WIZARD_M3_2_DEPTH + HOLE_WIZARD_M3_2_TIP / 2))):  # 118° drill point
                Cone(0, HOLE_WIZARD_M3_2_D / 2, HOLE_WIZARD_M3_2_TIP, mode=Mode.SUBTRACT)


solid = part.part
